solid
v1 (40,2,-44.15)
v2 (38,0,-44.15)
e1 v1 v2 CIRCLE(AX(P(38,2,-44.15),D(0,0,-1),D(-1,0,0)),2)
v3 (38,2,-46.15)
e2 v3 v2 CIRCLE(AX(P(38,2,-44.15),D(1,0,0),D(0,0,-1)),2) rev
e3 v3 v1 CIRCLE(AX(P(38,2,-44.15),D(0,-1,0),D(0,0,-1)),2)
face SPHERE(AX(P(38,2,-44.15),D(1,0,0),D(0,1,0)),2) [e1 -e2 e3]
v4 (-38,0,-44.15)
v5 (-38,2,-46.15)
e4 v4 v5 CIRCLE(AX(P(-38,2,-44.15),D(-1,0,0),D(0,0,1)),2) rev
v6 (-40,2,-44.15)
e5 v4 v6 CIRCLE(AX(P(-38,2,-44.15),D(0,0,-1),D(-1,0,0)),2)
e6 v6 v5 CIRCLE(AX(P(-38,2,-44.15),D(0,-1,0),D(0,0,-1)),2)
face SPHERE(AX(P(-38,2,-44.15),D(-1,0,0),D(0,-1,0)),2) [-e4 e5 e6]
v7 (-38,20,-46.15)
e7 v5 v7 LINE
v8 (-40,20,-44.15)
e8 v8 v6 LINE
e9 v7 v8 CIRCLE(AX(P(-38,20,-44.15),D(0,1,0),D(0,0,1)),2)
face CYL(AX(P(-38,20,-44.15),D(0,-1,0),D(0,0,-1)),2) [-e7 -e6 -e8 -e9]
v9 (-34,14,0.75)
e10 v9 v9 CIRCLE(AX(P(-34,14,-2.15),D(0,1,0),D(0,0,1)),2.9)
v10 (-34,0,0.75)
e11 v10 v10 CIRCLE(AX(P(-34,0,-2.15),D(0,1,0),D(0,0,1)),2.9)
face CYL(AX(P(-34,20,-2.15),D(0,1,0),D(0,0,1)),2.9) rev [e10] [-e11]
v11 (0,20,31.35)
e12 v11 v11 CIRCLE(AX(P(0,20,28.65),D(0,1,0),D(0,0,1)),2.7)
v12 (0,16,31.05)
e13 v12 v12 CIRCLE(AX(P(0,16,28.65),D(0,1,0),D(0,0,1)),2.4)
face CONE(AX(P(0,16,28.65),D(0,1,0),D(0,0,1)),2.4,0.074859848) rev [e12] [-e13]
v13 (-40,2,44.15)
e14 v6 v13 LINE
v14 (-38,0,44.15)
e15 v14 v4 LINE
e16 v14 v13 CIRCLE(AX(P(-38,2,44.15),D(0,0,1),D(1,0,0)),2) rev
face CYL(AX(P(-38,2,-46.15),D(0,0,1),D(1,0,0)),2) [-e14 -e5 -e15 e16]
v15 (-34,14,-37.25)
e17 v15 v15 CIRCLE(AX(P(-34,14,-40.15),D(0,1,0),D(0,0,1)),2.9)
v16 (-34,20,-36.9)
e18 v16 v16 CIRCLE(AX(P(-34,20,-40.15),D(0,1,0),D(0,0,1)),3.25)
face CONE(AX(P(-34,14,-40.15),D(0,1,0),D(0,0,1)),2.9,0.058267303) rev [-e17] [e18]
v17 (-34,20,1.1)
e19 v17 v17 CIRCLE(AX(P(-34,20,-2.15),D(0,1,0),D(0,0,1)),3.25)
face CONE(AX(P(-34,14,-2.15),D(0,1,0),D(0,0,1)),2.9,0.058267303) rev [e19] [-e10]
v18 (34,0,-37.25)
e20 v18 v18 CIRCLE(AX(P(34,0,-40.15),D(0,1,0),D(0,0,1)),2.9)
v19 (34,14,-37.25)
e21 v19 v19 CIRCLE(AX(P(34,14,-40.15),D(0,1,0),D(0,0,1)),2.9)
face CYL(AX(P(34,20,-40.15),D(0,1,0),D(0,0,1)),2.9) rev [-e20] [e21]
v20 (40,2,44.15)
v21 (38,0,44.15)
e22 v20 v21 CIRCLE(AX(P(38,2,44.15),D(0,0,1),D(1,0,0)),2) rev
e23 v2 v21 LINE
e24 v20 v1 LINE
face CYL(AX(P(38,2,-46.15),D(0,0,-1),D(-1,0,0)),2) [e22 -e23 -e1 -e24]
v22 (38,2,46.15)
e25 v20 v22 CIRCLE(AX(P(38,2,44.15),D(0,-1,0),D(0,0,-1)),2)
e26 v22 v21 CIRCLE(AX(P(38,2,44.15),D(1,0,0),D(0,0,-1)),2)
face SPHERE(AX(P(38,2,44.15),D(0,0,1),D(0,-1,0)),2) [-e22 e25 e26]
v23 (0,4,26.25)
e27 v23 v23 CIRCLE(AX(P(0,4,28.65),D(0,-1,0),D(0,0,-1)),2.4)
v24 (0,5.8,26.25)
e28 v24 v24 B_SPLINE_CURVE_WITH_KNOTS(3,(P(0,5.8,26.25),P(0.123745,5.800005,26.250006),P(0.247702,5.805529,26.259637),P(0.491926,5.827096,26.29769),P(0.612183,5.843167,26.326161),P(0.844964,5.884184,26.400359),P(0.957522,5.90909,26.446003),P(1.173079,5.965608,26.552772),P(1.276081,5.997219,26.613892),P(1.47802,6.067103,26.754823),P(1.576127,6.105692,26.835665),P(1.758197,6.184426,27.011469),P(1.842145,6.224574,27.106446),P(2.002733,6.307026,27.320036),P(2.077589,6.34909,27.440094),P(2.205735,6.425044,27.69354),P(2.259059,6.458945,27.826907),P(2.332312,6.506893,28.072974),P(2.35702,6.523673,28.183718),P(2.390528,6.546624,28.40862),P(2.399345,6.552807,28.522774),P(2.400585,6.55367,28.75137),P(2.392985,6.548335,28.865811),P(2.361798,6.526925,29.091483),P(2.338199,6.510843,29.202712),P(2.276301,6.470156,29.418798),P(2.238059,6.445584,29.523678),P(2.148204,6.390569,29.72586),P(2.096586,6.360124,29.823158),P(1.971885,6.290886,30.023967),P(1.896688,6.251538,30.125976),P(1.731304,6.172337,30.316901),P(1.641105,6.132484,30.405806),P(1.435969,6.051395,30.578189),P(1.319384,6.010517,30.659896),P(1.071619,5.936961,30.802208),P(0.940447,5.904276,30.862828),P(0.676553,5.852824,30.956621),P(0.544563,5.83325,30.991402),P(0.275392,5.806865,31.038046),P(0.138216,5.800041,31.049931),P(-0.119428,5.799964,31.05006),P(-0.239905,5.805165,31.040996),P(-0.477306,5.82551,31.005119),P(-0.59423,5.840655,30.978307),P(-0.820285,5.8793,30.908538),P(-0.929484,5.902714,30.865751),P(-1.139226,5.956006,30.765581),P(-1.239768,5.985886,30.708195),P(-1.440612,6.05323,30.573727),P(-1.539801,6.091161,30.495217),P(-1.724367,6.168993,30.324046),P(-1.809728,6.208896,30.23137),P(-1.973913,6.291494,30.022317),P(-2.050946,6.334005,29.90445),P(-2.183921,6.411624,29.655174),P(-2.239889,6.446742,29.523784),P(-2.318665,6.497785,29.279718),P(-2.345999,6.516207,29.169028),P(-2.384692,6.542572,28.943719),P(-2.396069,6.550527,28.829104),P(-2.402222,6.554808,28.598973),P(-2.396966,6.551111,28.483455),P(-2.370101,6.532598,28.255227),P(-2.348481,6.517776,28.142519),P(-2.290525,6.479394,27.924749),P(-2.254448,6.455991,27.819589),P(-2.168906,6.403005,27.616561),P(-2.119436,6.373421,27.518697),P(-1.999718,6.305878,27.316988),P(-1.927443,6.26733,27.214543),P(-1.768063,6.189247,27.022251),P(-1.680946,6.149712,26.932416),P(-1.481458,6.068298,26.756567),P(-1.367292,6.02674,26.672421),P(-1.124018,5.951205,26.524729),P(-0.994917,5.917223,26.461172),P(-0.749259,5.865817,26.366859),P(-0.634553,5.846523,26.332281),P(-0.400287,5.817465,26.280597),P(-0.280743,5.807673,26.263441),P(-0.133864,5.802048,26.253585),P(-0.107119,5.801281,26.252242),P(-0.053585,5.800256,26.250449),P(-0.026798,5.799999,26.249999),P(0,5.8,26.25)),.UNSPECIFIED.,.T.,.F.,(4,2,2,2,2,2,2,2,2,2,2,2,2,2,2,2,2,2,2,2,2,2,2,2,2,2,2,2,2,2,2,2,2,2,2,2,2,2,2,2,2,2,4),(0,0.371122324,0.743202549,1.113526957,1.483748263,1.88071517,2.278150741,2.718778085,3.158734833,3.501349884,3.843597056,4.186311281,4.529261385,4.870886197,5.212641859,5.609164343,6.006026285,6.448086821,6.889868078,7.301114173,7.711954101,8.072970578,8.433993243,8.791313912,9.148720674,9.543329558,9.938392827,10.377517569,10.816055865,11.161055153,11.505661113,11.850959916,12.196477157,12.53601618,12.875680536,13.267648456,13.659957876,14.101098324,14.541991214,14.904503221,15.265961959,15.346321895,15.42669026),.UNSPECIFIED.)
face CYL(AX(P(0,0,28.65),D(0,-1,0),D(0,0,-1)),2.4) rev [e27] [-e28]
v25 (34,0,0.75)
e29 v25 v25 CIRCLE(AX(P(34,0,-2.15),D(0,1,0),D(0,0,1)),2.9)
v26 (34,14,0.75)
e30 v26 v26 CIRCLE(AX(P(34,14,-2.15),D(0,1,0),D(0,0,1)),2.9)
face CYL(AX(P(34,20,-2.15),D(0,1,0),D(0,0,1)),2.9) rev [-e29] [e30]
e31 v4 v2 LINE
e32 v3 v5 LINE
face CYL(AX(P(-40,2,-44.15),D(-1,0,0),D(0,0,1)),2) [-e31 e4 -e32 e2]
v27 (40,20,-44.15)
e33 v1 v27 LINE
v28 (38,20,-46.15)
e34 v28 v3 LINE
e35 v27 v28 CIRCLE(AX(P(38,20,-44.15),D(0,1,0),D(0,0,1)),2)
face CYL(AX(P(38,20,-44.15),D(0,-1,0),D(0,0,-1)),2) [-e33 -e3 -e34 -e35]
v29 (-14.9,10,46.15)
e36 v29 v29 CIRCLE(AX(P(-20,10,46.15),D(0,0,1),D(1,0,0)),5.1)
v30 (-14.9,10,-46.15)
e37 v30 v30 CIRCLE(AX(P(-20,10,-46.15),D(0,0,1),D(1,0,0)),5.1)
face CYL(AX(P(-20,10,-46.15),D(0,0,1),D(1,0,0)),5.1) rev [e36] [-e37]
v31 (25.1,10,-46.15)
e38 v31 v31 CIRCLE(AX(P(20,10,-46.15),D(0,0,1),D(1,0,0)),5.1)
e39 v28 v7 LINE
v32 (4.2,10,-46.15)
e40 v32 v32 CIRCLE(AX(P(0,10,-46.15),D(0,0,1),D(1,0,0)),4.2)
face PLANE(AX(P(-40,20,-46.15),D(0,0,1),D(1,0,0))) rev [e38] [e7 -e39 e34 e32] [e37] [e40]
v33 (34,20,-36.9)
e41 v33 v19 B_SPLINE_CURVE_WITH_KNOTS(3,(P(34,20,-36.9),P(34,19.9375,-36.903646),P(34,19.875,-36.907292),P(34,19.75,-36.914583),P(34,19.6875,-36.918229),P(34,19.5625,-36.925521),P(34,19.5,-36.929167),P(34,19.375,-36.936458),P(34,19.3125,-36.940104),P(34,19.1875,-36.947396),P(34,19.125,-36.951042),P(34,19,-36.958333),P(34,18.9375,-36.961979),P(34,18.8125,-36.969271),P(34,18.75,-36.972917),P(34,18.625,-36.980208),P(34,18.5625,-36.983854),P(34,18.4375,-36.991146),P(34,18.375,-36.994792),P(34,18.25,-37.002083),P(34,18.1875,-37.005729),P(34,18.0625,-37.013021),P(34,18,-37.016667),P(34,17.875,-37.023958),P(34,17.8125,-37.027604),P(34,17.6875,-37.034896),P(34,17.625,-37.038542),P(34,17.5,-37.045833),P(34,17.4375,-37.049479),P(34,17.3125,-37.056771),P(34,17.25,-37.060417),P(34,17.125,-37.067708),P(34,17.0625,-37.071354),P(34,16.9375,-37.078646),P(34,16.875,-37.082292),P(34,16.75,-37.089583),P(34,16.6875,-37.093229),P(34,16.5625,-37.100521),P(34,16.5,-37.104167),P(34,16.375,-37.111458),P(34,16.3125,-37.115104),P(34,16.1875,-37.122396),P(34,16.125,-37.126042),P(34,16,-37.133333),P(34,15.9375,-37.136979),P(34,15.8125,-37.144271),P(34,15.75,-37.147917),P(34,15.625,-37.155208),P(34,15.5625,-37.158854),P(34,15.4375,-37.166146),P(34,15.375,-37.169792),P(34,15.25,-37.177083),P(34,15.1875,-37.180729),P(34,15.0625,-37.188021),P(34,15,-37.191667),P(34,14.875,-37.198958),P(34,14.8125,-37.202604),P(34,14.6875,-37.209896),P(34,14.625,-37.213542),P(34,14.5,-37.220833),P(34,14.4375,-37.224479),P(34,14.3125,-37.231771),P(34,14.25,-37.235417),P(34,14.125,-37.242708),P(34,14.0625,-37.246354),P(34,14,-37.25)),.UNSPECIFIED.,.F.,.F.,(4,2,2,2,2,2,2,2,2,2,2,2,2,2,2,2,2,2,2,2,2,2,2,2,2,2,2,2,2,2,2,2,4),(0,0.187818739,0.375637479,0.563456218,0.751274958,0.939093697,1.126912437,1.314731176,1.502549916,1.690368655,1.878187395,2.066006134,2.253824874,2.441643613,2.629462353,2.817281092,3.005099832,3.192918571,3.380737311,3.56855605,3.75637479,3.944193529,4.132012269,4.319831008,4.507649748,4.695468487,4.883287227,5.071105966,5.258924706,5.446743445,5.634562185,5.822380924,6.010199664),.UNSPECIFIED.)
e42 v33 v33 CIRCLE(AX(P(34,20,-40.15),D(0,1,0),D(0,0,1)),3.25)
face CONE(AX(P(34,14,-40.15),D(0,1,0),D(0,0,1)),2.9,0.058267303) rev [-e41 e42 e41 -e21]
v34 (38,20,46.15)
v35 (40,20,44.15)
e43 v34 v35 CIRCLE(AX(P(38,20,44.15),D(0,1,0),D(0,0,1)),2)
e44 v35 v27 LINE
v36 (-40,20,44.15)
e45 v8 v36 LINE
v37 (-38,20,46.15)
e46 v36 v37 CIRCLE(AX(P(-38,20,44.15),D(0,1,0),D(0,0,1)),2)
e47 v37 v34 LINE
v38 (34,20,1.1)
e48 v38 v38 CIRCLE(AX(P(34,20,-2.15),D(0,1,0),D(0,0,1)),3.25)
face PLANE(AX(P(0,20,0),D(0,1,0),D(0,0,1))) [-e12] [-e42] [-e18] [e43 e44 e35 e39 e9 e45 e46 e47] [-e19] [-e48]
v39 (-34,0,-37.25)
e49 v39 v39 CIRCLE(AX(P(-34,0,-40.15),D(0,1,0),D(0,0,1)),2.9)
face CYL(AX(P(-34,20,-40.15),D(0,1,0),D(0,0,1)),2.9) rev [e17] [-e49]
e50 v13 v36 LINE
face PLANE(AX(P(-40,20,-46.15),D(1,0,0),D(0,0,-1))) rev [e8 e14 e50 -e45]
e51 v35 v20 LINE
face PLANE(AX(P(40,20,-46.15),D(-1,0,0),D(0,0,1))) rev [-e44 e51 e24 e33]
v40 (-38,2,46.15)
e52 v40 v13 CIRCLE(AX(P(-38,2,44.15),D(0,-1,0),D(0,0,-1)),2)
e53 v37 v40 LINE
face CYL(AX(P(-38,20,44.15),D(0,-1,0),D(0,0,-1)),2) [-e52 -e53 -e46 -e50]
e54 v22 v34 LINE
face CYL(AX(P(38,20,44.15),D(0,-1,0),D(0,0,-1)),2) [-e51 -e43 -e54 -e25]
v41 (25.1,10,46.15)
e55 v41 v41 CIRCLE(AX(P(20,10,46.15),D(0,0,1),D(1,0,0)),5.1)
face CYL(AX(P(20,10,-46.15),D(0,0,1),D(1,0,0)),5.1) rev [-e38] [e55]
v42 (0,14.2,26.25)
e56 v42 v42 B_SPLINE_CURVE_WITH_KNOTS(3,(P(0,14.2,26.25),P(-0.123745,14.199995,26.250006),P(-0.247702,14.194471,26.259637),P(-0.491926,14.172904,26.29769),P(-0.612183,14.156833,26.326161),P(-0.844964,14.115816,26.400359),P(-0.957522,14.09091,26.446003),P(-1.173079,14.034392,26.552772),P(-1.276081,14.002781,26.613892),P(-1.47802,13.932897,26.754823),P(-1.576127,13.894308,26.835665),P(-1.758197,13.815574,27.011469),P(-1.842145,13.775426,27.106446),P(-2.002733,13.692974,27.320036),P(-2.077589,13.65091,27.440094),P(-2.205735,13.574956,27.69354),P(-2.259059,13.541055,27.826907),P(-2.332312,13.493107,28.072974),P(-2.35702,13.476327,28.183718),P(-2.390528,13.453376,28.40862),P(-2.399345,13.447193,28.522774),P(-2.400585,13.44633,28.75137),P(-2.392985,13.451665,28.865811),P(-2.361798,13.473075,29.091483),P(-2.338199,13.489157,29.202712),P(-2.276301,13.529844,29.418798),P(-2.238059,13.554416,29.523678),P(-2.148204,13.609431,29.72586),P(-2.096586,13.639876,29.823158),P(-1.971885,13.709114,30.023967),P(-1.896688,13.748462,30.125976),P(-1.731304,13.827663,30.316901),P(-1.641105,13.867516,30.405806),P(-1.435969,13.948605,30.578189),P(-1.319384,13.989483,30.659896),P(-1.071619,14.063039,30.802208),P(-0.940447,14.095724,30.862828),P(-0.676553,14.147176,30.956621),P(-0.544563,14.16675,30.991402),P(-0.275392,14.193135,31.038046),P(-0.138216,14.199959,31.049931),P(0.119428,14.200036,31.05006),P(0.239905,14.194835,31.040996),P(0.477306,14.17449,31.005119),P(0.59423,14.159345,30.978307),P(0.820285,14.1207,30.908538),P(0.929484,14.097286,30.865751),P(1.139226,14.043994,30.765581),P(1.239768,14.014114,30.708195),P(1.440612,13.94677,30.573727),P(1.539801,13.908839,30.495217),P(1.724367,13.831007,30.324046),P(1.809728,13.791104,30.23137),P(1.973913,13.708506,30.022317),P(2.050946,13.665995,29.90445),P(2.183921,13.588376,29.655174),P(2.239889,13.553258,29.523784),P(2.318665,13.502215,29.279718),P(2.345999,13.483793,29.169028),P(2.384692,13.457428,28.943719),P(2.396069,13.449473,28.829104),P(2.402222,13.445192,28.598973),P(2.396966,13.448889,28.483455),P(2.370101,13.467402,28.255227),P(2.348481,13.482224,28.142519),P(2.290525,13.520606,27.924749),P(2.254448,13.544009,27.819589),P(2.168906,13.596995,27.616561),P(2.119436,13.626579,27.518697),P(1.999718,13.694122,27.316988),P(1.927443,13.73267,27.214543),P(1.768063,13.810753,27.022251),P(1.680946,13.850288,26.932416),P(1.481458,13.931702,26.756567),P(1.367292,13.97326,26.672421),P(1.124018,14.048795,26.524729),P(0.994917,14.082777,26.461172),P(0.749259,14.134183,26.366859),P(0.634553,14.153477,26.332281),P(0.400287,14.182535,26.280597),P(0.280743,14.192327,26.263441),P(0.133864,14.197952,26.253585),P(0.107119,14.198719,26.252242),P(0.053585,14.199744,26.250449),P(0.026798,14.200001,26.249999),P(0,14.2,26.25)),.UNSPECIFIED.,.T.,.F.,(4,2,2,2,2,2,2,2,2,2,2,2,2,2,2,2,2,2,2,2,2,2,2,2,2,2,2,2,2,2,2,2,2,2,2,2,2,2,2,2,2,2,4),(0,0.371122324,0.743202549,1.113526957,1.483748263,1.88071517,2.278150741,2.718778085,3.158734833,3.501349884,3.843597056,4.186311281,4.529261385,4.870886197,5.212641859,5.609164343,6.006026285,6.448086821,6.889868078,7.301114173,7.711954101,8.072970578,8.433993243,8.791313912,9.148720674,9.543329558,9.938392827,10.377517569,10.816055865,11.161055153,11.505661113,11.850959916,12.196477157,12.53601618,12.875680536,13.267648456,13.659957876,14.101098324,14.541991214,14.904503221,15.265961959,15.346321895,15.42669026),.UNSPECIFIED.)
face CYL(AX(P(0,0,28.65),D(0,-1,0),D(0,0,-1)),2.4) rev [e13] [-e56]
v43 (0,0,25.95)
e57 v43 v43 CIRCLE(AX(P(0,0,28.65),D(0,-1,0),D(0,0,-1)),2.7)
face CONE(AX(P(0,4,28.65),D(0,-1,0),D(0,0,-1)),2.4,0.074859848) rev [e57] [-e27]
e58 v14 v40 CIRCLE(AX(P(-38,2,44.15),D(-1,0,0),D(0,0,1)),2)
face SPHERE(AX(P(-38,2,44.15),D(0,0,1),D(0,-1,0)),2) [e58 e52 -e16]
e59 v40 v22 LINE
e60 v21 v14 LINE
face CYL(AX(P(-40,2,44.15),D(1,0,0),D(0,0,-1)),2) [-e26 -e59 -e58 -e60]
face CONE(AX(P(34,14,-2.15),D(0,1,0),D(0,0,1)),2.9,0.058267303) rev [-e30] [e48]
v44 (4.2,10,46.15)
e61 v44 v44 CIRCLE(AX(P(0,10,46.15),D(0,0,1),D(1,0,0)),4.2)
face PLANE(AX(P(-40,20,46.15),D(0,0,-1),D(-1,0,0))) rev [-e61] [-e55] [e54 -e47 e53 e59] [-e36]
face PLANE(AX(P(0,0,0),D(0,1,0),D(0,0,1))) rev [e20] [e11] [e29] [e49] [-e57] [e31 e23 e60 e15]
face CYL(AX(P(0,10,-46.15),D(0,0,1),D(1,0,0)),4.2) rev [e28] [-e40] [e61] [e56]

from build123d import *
from OCP.BRepFilletAPI import BRepFilletAPI_MakeChamfer

# Parameters (mm, degrees)
SKETCH1_W                 = 80
SKETCH1_H                 = 92.3
BOSS_EXTRUDE1_DEPTH       = 20
HOLE1_D                   = 5.8
HOLE1_CBORE_D             = 6.5
HOLE1_CBORE_DEPTH         = 6
CHAMFER1_SIZE             = 6
CHAMFER1_SIZE_2           = 0.35
SKETCH4_R                 = 4.2
SKETCH4_R_2               = 5.1
CUT_EXTRUDE1_DEPTH        = 103.563590031
HOLE2_D                   = 4.8
HOLE2_CBORE_D             = 5.4
HOLE2_CBORE_DEPTH         = 4
CHAMFER2_SIZE2            = 0.3
CHAMFER2_SIZE             = 4
CHAMFER2_OF_MIRROR1_SIZE2 = 0.3
CHAMFER2_OF_MIRROR1_SIZE  = 4
FILLET1_R                 = 2


with BuildPart() as part:
    # Sketch1 → Boss-Extrude1 (new body)
    with BuildSketch(Plane(origin=(0, 0, 0), x_dir=(1, 0, 0), z_dir=(0, 1, 0))):
        Rectangle(SKETCH1_W, SKETCH1_H)
    extrude(amount=BOSS_EXTRUDE1_DEPTH)

    # Hole1 (through all)
    with Locations(Plane(origin=(0, 20, 0), x_dir=(1, 0, 0), z_dir=(0, 1, 0))):
        with Locations((-34, 40.15), (34, 40.15), (34, 2.15), (-34, 2.15)):
            CounterBoreHole(HOLE1_D / 2, HOLE1_CBORE_D / 2, HOLE1_CBORE_DEPTH)

    # Chamfer1
    chamfer1_edges_1 = [part.edges().sort_by_distance(p)[0] for p in [
        (-37.25, 14, -2.15),
    ]]
    chamfer1_side_1 = [part.faces().sort_by_distance(p)[0] for p in [
        (-37.25, 14.007, -2.15),
    ]]
    chamfer1_edges_2 = [part.edges().sort_by_distance(p)[0] for p in [
        (30.75, 14, -2.15),
    ]]
    chamfer1_side_2 = [part.faces().sort_by_distance(p)[0] for p in [
        (30.75, 14.007, -2.15),
    ]]
    chamfer1_edges_3 = [part.edges().sort_by_distance(p)[0] for p in [
        (30.75, 14, -40.15),
    ]]
    chamfer1_side_3 = [part.faces().sort_by_distance(p)[0] for p in [
        (30.75, 14.007, -40.15),
    ]]
    chamfer1_edges_4 = [part.edges().sort_by_distance(p)[0] for p in [
        (-37.25, 14, -40.15),
    ]]
    chamfer1_side_4 = [part.faces().sort_by_distance(p)[0] for p in [
        (-37.25, 14.007, -40.15),
    ]]
    chamfer1 = BRepFilletAPI_MakeChamfer(part.part.solid().wrapped)
    for e in chamfer1_edges_1:
        chamfer1.Add(CHAMFER1_SIZE - 0.0001, CHAMFER1_SIZE_2 - 0.0001, e.wrapped, chamfer1_side_1[0].wrapped)
    for e in chamfer1_edges_2:
        chamfer1.Add(CHAMFER1_SIZE - 0.0001, CHAMFER1_SIZE_2 - 0.0001, e.wrapped, chamfer1_side_2[0].wrapped)
    for e in chamfer1_edges_3:
        chamfer1.Add(CHAMFER1_SIZE - 0.0001, CHAMFER1_SIZE_2 - 0.0001, e.wrapped, chamfer1_side_3[0].wrapped)
    for e in chamfer1_edges_4:
        chamfer1.Add(CHAMFER1_SIZE - 0.0001, CHAMFER1_SIZE_2 - 0.0001, e.wrapped, chamfer1_side_4[0].wrapped)
    add(Compound.cast(chamfer1.Shape()), mode=Mode.REPLACE)  # a hair under: the kernel refuses the full size

    # Sketch4 → Cut-Extrude1 (cut, through all)
    with BuildSketch(Plane.XY.offset(46.15)):
        with Locations((0, 10)):
            Circle(SKETCH4_R)
        with Locations((-20, 10)):
            Circle(SKETCH4_R_2)
        with Locations((20, 10)):
            Circle(SKETCH4_R_2)
    extrude(amount=-CUT_EXTRUDE1_DEPTH, mode=Mode.SUBTRACT)

    # Hole2 (through all)
    with Locations(Plane(origin=(-40, 0, 0), x_dir=(0, 0, 1), z_dir=(0, -1, 0))):
        with Locations((28.65, -40)):
            hole2 = CounterBoreHole(HOLE2_D / 2, HOLE2_CBORE_D / 2, HOLE2_CBORE_DEPTH)

    # Chamfer2
    chamfer2_edges = [part.edges().sort_by_distance(p)[0] for p in [
        (0, 4, 25.95),
    ]]
    chamfer2_side = [part.faces().sort_by_distance(p)[0] for p in [
        (0, 3.994, 25.95),
    ]]
    chamfer(chamfer2_edges, length=CHAMFER2_SIZE - 0.0001, length2=CHAMFER2_SIZE2 - 0.0001, reference=chamfer2_side[0])  # a hair under: the kernel refuses the full size

    # Mirror1: Hole2 across plane
    add(hole2.mirror(Plane.ZX.offset(10)), mode=Mode.SUBTRACT)

    # Chamfer2 of Mirror1
    chamfer2_of_mirror1_edges = [part.edges().sort_by_distance(p)[0] for p in [
        (0, 16, 25.95),
    ]]
    chamfer2_of_mirror1_side = [part.faces().sort_by_distance(p)[0] for p in [
        (0, 16.006, 25.95),
    ]]
    chamfer(chamfer2_of_mirror1_edges, length=CHAMFER2_OF_MIRROR1_SIZE - 0.0001, length2=CHAMFER2_OF_MIRROR1_SIZE2 - 0.0001, reference=chamfer2_of_mirror1_side[0])  # a hair under: the kernel refuses the full size

    # Fillet1
    fillet1_edges = [part.edges().sort_by_distance(p)[0] for p in [
        (0, 0, 46.15),
        (-40, 0, 0),
        (0, 0, -46.15),
        (40, 0, 0),
        (40, 10, 46.15),
        (-40, 10, 46.15),
        (-40, 10, -46.15),
        (40, 10, -46.15),
    ]]
    fillet(fillet1_edges, radius=FILLET1_R)


solid = part.part
